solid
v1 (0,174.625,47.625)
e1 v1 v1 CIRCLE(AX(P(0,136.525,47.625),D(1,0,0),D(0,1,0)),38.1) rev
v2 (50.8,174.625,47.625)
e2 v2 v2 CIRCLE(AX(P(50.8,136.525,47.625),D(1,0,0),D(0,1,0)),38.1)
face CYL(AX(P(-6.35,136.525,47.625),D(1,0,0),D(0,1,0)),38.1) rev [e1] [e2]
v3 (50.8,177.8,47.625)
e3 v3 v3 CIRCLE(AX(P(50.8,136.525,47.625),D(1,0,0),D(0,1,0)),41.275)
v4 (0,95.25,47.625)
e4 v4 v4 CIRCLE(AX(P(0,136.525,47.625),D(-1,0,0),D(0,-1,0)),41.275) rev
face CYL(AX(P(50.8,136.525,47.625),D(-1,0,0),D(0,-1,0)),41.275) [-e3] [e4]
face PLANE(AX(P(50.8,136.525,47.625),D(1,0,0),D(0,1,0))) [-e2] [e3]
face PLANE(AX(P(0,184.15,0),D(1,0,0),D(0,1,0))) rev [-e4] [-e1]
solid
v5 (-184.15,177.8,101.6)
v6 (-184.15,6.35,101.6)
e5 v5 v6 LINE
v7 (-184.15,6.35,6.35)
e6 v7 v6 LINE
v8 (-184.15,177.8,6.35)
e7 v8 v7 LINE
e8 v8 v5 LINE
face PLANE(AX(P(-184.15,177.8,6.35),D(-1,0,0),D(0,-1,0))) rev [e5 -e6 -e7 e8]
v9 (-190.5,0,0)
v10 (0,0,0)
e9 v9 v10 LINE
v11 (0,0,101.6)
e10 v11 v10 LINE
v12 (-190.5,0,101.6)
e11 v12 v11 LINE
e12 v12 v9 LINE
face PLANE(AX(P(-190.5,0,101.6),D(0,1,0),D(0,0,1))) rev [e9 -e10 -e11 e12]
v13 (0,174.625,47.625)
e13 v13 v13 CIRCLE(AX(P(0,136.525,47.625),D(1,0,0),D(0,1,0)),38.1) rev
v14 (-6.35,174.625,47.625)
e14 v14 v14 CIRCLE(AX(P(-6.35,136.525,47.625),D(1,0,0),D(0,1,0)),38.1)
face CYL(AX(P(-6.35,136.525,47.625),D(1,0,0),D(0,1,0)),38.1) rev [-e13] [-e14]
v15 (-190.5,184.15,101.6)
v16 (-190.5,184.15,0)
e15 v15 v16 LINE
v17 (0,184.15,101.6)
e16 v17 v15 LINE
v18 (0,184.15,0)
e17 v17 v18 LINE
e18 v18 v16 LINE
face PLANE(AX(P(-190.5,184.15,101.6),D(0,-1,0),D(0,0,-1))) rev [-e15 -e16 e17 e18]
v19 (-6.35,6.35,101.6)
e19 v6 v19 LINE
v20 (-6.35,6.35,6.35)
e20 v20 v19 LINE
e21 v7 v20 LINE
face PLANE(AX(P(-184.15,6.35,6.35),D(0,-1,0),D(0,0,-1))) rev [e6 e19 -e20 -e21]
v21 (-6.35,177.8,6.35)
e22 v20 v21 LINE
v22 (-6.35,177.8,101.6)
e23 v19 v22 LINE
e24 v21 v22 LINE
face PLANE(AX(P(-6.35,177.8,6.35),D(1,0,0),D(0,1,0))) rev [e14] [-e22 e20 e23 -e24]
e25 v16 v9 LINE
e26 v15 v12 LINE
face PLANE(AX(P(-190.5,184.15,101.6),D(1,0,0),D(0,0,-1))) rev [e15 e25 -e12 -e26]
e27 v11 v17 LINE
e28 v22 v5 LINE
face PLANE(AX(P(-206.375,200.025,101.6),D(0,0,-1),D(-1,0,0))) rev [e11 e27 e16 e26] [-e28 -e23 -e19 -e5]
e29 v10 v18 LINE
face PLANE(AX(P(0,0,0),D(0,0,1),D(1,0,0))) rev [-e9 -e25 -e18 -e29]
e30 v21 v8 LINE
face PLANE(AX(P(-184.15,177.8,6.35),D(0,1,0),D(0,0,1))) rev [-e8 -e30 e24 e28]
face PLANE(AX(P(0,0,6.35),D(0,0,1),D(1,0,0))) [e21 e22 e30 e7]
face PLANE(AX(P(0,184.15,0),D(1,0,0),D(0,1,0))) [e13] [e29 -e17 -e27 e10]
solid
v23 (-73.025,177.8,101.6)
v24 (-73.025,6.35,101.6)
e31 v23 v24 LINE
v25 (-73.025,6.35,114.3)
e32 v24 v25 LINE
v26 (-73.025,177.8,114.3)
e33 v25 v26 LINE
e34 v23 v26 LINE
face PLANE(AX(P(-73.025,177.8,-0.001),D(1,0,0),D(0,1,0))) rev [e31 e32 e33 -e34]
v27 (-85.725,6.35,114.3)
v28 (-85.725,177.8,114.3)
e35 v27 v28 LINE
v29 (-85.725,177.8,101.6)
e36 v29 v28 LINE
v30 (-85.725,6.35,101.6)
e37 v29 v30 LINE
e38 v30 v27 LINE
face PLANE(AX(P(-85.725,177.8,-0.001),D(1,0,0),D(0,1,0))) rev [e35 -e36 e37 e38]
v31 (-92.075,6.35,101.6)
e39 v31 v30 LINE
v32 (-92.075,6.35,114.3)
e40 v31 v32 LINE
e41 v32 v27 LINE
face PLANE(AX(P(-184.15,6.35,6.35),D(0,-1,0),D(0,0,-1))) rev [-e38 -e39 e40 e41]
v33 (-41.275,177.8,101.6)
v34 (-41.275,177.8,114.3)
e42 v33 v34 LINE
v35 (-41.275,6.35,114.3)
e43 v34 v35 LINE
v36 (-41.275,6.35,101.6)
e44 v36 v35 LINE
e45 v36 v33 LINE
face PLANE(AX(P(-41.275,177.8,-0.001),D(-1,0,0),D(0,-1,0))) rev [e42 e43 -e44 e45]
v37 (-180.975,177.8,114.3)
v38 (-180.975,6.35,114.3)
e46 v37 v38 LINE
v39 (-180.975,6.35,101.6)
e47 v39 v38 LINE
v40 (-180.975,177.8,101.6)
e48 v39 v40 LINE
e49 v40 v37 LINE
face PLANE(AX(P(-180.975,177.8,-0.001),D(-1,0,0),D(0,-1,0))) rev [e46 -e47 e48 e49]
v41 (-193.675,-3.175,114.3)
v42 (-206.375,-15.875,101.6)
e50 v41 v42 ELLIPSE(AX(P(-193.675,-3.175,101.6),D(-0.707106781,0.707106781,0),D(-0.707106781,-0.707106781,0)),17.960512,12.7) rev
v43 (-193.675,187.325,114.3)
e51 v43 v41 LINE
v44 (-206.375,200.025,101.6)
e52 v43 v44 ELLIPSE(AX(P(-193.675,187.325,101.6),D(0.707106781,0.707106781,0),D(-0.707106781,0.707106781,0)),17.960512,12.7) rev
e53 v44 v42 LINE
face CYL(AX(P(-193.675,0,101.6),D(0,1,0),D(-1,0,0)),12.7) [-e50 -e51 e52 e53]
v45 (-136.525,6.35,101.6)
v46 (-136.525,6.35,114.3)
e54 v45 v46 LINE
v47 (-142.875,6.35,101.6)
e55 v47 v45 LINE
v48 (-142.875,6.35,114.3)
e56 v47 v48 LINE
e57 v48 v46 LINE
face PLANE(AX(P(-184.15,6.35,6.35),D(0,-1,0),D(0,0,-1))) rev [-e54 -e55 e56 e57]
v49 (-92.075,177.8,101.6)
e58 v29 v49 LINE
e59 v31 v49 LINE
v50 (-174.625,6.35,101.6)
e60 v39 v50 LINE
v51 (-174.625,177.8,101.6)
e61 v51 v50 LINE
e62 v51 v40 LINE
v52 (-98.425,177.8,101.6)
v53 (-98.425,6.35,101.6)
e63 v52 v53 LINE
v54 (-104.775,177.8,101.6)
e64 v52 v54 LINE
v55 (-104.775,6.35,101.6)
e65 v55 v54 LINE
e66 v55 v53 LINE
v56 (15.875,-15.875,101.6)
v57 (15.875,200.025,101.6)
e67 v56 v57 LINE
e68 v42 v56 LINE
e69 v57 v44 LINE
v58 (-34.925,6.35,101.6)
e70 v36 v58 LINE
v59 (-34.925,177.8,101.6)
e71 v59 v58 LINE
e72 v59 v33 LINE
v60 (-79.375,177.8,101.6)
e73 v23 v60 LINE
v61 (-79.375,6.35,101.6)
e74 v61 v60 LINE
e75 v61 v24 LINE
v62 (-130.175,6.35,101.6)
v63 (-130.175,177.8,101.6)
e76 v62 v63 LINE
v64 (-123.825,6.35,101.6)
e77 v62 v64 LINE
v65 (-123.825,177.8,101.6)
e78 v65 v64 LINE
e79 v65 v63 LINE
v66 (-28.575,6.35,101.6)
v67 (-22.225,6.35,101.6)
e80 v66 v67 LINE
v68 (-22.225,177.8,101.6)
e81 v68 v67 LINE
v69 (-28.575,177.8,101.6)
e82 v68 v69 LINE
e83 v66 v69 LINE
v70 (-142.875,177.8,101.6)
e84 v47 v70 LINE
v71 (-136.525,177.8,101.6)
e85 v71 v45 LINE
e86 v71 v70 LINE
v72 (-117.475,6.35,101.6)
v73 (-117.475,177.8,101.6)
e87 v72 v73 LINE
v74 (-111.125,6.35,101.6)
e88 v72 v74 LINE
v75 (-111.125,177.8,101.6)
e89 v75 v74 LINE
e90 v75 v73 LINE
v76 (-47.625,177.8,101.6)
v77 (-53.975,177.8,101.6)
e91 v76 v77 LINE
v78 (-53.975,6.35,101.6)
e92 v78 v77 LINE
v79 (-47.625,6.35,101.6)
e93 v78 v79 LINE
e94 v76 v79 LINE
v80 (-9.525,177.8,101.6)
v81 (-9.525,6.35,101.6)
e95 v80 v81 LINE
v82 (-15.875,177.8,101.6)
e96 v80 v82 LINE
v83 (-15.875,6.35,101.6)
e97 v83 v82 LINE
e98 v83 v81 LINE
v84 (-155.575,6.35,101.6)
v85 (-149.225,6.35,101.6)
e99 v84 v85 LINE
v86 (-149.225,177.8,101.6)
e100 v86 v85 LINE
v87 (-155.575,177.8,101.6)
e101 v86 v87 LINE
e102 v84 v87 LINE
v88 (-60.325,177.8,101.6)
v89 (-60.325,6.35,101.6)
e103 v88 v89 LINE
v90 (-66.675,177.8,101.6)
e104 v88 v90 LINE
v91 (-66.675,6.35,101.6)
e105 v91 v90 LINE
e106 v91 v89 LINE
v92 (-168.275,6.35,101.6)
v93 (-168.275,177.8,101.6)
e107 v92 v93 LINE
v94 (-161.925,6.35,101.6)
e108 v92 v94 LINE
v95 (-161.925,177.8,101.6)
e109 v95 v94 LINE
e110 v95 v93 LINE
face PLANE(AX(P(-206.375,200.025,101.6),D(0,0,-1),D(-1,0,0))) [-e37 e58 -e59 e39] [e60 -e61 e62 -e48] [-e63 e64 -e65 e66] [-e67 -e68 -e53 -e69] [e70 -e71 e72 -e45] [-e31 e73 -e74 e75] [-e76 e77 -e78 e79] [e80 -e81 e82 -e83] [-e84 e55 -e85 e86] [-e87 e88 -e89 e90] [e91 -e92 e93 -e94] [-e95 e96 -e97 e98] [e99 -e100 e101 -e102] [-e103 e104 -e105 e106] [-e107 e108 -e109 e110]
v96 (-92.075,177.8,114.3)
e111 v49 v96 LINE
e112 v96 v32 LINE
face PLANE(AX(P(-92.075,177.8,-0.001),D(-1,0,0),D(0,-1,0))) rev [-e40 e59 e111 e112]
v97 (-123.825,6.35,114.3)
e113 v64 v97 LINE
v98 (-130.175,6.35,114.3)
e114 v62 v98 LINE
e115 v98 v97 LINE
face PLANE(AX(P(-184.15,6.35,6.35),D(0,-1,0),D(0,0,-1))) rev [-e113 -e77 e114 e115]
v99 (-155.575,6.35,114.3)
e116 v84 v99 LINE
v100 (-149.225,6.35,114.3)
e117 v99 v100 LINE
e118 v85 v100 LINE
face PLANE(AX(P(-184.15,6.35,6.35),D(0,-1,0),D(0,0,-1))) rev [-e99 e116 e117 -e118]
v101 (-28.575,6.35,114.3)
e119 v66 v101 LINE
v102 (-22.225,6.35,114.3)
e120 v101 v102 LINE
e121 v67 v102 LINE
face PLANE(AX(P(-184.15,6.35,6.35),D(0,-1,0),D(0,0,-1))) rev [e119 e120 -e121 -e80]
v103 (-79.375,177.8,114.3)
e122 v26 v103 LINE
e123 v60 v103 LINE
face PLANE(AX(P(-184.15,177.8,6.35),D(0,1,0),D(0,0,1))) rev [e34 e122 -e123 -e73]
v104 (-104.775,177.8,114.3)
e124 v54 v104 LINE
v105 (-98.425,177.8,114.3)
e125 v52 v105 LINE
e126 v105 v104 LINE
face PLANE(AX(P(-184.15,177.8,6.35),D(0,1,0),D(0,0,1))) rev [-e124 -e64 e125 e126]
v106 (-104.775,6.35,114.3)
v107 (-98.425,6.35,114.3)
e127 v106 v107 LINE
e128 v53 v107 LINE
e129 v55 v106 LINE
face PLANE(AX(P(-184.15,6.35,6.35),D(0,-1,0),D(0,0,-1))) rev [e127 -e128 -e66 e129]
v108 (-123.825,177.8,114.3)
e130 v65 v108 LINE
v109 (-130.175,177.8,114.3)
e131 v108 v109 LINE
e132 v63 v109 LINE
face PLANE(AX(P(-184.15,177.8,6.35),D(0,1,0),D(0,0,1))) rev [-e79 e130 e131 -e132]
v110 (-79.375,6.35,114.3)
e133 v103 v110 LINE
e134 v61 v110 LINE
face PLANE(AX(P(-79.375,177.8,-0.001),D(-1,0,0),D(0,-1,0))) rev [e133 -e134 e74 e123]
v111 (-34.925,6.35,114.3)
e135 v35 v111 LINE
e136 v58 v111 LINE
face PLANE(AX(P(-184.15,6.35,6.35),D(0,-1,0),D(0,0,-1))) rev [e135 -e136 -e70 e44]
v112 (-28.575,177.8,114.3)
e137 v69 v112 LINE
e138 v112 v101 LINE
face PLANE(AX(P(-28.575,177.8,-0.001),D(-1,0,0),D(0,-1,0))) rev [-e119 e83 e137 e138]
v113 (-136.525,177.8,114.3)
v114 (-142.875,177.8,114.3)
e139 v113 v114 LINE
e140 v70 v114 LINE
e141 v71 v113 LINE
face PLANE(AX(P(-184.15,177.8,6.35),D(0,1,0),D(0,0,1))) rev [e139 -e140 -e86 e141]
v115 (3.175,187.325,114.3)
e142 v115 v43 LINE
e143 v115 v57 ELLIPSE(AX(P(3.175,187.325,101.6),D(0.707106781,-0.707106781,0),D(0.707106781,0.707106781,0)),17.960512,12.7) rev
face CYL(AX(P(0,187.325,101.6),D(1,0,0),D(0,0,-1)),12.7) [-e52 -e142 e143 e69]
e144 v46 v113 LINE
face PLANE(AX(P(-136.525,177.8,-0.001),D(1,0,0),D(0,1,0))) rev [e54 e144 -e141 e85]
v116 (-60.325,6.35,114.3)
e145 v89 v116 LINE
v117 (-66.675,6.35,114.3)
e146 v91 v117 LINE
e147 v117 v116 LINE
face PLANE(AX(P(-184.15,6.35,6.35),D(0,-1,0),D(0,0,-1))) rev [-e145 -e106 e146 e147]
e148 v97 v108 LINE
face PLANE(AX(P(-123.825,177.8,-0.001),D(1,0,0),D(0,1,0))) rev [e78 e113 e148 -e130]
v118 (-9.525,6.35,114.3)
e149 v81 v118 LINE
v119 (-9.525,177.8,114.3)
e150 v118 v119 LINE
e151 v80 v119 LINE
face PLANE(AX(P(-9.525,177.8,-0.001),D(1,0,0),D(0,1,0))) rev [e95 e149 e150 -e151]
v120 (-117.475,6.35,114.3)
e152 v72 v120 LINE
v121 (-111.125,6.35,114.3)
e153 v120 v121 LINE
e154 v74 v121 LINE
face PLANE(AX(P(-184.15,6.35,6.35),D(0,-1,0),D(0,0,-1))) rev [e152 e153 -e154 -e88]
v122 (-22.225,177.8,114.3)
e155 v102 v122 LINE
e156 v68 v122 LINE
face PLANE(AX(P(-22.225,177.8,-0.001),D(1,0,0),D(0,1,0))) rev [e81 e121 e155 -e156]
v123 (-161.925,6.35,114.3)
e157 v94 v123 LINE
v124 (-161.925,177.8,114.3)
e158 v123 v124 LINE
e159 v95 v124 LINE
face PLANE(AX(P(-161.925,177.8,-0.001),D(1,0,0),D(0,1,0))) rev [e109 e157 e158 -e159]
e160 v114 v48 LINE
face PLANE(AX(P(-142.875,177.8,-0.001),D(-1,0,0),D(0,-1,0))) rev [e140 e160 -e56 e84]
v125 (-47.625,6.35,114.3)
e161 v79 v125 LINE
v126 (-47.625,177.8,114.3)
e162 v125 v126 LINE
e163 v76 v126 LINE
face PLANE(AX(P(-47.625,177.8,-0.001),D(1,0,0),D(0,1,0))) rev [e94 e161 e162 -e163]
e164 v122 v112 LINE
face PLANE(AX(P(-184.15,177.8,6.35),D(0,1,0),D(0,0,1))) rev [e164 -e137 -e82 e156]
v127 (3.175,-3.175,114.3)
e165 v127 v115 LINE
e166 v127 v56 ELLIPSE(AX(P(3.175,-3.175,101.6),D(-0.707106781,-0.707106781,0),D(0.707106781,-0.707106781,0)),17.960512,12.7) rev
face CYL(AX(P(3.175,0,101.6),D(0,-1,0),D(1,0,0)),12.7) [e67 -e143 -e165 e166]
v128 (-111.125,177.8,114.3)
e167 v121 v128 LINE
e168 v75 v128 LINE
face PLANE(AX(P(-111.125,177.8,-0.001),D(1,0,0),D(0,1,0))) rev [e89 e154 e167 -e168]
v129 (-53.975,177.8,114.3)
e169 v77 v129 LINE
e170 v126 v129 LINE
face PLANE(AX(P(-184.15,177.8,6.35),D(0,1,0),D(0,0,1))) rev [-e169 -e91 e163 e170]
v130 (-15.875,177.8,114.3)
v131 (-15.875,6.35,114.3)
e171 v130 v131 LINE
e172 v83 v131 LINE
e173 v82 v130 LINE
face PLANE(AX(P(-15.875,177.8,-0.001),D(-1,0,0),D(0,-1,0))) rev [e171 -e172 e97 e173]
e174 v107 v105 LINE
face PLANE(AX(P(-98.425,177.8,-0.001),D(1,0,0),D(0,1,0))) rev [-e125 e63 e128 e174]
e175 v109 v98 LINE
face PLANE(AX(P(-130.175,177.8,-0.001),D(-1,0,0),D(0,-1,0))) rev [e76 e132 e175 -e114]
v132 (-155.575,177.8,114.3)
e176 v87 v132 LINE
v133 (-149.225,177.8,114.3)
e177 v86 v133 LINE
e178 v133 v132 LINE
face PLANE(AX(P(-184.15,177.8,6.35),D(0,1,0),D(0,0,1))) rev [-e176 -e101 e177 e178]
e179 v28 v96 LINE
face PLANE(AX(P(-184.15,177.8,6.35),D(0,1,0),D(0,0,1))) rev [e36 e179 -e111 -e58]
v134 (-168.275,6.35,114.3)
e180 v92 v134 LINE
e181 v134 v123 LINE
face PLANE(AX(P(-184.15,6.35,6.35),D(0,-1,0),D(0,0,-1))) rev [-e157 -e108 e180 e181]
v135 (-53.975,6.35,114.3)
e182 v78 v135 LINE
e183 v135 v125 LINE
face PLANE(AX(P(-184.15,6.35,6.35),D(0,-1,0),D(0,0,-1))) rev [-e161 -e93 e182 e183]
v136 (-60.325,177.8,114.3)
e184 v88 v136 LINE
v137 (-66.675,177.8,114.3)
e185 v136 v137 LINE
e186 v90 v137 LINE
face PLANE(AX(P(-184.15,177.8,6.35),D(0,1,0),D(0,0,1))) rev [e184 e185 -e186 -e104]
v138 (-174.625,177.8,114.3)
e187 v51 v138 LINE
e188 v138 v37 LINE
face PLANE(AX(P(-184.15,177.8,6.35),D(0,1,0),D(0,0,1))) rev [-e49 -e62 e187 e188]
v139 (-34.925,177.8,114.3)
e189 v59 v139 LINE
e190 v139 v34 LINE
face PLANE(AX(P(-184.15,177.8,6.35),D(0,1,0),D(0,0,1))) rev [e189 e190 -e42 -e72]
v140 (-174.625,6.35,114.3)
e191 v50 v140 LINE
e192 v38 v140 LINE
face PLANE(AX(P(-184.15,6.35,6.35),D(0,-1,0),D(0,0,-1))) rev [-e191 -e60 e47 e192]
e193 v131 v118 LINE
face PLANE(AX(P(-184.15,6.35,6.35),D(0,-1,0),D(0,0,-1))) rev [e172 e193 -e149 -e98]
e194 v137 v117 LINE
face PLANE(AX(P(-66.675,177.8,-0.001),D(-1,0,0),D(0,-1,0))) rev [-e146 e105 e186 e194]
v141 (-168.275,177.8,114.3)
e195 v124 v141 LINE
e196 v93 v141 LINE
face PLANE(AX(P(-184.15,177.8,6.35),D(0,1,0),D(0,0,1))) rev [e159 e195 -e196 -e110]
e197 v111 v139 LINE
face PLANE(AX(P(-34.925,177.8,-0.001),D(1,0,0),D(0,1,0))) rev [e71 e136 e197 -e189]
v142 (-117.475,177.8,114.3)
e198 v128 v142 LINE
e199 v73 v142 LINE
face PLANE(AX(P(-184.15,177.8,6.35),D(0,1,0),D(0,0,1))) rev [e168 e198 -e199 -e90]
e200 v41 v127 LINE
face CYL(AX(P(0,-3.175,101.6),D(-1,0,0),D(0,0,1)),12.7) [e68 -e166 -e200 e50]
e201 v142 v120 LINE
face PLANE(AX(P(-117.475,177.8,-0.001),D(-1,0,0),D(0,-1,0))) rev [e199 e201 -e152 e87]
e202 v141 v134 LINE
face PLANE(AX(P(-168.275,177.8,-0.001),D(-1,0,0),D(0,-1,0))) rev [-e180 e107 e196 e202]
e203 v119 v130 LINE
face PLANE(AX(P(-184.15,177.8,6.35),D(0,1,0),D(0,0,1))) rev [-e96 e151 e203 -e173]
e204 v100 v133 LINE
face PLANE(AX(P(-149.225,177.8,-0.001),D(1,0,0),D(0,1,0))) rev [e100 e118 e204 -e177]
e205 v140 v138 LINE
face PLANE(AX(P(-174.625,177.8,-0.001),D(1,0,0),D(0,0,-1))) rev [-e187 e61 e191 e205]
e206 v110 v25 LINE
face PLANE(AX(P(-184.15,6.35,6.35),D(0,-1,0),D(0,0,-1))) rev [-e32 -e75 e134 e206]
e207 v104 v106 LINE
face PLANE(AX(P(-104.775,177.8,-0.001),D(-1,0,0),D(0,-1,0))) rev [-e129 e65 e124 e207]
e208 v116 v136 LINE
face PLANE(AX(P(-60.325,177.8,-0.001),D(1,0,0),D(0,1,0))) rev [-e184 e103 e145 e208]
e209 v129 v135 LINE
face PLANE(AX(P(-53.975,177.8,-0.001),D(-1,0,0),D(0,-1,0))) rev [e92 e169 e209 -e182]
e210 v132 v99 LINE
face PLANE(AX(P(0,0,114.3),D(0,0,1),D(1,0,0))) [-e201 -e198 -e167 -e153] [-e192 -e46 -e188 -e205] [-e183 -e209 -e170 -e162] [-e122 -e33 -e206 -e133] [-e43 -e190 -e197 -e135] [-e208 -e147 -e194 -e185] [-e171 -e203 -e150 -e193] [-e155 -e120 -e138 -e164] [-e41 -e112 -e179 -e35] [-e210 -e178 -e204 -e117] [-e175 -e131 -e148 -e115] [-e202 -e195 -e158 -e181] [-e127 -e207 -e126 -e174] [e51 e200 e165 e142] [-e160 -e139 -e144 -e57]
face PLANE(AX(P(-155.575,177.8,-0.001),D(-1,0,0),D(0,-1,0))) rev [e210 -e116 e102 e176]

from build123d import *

# Parameters (mm, degrees)
SKETCH2_W          = 190.5
SKETCH2_H          = 184.15
HOUSING_DEPTH      = 101.6
SKETCH4_W          = 177.8
SKETCH4_H          = 171.45
CUT_EXTRUDE1_DEPTH = 95.25
SKETCH6_W          = 222.25
SKETCH6_H          = 215.9
GRILL_DEPTH        = 12.7
CUT_EXTRUDE2_REACH = 311.298
SKETCH7_W          = 6.35
SKETCH7_H          = 171.45
CUT_EXTRUDE3_REACH = 311.298
SKETCH8_W          = 6.35
SKETCH8_H          = 171.45
LPATTERN2_COUNT    = 13
LPATTERN2_PITCH    = 12.7
FILLET1_R          = 12.7
SKETCH9_R          = 41.275
DUCT_DEPTH         = 50.8
SKETCH10_R         = 38.1
CUT_EXTRUDE4_DEPTH = 57.15


# Read off the part's stored shape, not the designer's step: Split1, Split4
with BuildPart() as part:
    # Sketch2 → Housing (new body)
    with BuildSketch(Plane.XY):
        with Locations((-95.25, 92.075)):
            Rectangle(SKETCH2_W, SKETCH2_H)
    extrude(amount=HOUSING_DEPTH)

    # Sketch4 → Cut-Extrude1 (cut)
    with BuildSketch(Plane.XY.offset(101.6)):
        with Locations((-95.25, 92.075)):
            Rectangle(SKETCH4_W, SKETCH4_H)
    extrude(amount=-CUT_EXTRUDE1_DEPTH, mode=Mode.SUBTRACT)

    # Sketch6 → Grill (add)
    with BuildSketch(Plane.XY.offset(101.6)):
        with Locations((-95.25, 92.075)):
            Rectangle(SKETCH6_W, SKETCH6_H)
    extrude(amount=GRILL_DEPTH)

    # Sketch7 → Cut-Extrude2 (cut, up to next)
    with BuildSketch(Plane.XY.offset(114.3), mode=Mode.PRIVATE) as cut_extrude2_sk1:
        with Locations((-177.8, 92.075)):
            Rectangle(SKETCH7_W, SKETCH7_H)
    cut_extrude2_tool1 = extrude(cut_extrude2_sk1.sketch, amount=-CUT_EXTRUDE2_REACH, mode=Mode.PRIVATE) & part.part
    add(cut_extrude2_tool1.solids().sort_by_distance((-177.8, 92.075, 114.3))[0], mode=Mode.SUBTRACT)

    # Sketch8 → Cut-Extrude3 (cut, up to next)
    with BuildSketch(Plane.XY.offset(114.3), mode=Mode.PRIVATE) as cut_extrude3_sk1:
        with Locations((-165.1, 92.075)):
            Rectangle(SKETCH8_W, SKETCH8_H)
    cut_extrude3_tool1 = extrude(cut_extrude3_sk1.sketch, amount=-CUT_EXTRUDE3_REACH, mode=Mode.PRIVATE) & part.part
    cut_extrude3 = cut_extrude3_tool1.solids().sort_by_distance((-165.1, 92.075, 114.3))[0]
    add(cut_extrude3, mode=Mode.SUBTRACT)

    # LPattern2: Cut-Extrude3 ×13
    with Locations(*[(i * LPATTERN2_PITCH, 0, 0) for i in range(1, LPATTERN2_COUNT)]):
        add(cut_extrude3, mode=Mode.SUBTRACT)

    # Fillet1
    fillet1_edges = [part.edges().sort_by_distance(p)[0] for p in [
        (-206.375, 92.075, 114.3),
        (-95.25, -15.875, 114.3),
        (15.875, 92.075, 114.3),
        (-95.25, 200.025, 114.3),
    ]]
    fillet(fillet1_edges, radius=FILLET1_R - 0.0001)  # a hair under: the kernel refuses the full size


with BuildPart() as body_2:
    # Split1: the piece on the far side of the plane
    add(part.part)
    split(bisect_by=Plane.XY.offset(101.6), keep=Keep.BOTTOM)

    # Sketch9 → Duct (add)
    with BuildSketch(Plane(origin=(0, 0, 0), x_dir=(0, 0, -1), z_dir=(1, 0, 0))):
        with Locations(Location((-47.625, 136.525, 0), (0, 0, 270))):
            Circle(SKETCH9_R)
    extrude(amount=DUCT_DEPTH)

    # Sketch10 → Cut-Extrude4 (cut)
    with BuildSketch(Plane(origin=(50.8, 0, 0), x_dir=(0, 0, -1), z_dir=(1, 0, 0))):
        with Locations(Location((-47.625, 136.525, 0), (0, 0, 90))):
            Circle(SKETCH10_R)
    extrude(amount=-CUT_EXTRUDE4_DEPTH, mode=Mode.SUBTRACT)


with BuildPart() as part_1:
    add(part.part)

    # Split1
    split(bisect_by=Plane.XY.offset(101.6), keep=Keep.TOP)


with BuildPart() as body_3:
    # Split4: the piece on the far side of the plane
    add(body_2.part)
    split(bisect_by=Plane.YZ, keep=Keep.BOTTOM)


with BuildPart() as body_2_1:
    add(body_2.part)

    # Split4
    split(bisect_by=Plane.YZ, keep=Keep.TOP)


solid = Compound([part_1.part, body_3.part, body_2_1.part])
